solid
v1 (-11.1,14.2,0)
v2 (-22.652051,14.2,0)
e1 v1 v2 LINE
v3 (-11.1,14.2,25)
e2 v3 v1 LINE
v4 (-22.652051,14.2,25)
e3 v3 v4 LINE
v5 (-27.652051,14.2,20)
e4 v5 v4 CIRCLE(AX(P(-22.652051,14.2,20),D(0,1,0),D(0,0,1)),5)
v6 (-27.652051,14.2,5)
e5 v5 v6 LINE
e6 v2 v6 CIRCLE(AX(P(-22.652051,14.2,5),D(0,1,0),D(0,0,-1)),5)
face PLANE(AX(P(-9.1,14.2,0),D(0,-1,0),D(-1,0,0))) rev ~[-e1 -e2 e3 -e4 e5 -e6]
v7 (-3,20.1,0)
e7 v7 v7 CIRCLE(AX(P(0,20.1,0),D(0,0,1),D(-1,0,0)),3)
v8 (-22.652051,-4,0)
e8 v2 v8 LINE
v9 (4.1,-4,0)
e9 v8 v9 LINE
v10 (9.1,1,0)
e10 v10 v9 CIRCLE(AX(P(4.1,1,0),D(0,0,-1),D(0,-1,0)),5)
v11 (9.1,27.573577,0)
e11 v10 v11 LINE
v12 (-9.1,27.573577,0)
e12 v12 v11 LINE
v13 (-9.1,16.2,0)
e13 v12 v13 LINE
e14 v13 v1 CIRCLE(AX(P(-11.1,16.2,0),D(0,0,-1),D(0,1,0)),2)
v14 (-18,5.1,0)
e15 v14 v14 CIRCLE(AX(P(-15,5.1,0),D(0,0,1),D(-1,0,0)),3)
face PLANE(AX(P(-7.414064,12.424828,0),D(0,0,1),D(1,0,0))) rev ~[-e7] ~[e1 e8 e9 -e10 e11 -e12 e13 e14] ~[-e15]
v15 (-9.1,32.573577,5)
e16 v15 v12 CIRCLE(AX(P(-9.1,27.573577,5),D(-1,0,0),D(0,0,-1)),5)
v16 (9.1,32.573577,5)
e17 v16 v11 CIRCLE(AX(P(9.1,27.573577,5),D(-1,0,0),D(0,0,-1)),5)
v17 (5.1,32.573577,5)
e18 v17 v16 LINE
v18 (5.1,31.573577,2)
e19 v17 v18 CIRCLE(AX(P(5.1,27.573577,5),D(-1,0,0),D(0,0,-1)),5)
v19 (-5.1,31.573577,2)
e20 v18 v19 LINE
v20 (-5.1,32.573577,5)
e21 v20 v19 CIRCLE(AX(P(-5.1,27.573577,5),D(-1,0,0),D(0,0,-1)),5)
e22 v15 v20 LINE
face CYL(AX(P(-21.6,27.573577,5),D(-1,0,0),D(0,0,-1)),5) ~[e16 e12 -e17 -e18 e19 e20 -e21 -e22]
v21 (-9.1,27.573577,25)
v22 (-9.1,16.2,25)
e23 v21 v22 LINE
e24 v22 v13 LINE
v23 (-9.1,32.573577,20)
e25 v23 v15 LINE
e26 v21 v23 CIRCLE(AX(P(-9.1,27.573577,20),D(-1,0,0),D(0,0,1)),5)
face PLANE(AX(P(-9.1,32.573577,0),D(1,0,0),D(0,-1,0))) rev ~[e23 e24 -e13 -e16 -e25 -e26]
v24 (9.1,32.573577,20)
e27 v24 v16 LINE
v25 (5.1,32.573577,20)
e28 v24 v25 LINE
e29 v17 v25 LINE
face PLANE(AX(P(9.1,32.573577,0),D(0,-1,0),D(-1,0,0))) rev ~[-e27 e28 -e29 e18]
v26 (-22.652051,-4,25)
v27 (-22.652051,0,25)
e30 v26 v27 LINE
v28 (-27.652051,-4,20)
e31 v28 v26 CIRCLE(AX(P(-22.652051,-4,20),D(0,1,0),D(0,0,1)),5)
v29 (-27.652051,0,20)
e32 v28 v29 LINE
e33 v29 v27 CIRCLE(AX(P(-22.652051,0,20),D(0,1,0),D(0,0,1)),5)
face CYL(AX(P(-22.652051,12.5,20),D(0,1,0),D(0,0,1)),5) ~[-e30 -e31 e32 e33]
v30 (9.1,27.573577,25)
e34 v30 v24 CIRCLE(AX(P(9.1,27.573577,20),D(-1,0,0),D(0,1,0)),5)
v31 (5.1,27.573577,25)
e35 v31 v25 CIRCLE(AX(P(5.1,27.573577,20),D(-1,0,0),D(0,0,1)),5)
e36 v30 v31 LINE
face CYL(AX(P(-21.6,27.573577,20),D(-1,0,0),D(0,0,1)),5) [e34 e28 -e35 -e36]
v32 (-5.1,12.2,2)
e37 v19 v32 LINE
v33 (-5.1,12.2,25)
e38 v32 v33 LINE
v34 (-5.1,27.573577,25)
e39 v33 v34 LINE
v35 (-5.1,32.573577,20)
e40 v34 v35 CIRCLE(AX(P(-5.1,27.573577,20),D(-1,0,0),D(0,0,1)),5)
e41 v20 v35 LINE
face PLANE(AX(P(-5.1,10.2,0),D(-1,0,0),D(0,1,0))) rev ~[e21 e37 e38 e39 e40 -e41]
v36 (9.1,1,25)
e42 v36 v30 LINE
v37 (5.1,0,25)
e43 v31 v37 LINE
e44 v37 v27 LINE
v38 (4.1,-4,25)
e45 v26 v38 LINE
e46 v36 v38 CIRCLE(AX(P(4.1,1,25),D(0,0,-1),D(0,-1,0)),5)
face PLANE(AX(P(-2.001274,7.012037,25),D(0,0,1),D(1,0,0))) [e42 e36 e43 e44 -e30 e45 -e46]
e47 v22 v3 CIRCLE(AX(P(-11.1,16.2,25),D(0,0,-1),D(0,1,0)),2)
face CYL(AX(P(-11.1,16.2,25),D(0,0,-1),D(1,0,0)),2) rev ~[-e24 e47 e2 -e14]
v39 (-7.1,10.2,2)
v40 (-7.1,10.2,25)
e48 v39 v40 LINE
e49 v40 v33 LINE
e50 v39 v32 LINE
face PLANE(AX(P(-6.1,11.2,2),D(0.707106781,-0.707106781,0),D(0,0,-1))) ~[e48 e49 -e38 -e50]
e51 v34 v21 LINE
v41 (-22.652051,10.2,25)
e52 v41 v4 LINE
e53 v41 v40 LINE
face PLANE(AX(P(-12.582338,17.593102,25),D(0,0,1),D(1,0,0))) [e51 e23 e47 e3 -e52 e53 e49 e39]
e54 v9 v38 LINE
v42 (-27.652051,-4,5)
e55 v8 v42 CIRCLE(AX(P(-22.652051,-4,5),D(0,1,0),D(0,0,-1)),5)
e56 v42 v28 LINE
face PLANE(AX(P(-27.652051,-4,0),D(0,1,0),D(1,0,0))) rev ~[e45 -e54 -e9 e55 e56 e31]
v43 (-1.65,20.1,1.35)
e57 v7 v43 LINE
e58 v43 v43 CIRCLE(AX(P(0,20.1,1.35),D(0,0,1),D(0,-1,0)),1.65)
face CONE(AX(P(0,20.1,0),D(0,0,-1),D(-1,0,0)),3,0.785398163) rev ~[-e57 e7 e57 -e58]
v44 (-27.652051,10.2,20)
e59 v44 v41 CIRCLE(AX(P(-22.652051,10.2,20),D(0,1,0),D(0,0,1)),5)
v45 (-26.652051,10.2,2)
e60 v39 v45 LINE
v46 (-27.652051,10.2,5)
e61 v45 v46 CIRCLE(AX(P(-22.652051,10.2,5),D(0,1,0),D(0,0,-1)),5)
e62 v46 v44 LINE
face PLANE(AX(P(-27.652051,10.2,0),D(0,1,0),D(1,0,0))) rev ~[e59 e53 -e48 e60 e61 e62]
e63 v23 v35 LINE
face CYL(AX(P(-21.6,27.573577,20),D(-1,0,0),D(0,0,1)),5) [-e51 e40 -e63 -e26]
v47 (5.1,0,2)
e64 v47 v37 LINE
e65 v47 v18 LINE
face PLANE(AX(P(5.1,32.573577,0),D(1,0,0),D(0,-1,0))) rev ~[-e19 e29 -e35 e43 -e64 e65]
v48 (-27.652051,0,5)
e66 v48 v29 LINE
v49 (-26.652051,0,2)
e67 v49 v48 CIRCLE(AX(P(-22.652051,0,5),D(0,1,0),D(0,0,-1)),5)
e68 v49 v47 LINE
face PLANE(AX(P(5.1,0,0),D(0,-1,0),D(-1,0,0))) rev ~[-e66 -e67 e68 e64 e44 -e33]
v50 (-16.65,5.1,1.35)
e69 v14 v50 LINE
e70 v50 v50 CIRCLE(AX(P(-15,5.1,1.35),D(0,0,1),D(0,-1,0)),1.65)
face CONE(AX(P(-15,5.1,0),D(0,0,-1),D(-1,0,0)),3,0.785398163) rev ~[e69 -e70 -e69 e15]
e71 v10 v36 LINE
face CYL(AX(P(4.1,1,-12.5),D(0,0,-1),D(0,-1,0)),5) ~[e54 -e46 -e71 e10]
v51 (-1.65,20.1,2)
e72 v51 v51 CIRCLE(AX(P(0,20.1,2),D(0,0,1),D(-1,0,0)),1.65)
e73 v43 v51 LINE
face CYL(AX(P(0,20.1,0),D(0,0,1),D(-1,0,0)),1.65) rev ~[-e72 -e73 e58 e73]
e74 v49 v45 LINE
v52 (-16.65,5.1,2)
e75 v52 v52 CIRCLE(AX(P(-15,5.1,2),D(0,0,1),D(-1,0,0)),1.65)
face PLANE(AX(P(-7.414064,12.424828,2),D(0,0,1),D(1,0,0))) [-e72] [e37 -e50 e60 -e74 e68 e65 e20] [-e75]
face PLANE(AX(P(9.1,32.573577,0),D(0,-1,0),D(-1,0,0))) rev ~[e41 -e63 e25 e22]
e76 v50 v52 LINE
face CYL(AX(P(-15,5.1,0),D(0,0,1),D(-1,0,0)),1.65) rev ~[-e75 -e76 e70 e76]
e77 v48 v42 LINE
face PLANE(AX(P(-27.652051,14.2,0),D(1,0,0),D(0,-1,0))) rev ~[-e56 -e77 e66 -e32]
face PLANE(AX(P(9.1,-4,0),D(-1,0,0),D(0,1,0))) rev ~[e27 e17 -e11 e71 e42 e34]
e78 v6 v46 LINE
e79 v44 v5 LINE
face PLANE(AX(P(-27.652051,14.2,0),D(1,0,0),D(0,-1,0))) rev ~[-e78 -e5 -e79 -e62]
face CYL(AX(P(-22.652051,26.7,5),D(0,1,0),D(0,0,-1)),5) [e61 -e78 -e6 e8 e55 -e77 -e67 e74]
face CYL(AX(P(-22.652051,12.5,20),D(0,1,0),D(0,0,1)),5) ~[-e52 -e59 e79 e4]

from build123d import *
from build123d import SkipClean  # not in build123d's __all__

# Parameters (mm, degrees)
F1_DEPTH       = 2
F2_DEPTH       = 25
F3_T1_DEPTH    = 29
F3_T3_DEPTH    = 29
F3_T5_DEPTH    = 29
F3_T7_DEPTH    = 29
F3_T9_DEPTH    = 43.2
F3_T11_DEPTH   = 43.2
F3_T13_DEPTH   = 50
F4_R           = 2
F5_SIZE        = 2
F7_D           = 3.3
F7_CSINK_D     = 6
F7_CSINK_ANGLE = 90


# Not quite as in the source:
# - a fillet or chamfer that OpenCascade refuses, or shapes differently, is made with other operations: its cross-section is extruded or revolved along the edge and cut away or added
# - a feature names something its author has since deleted; it is built from what else it names


with BuildPart() as f1:
    # F0 (on Top) → F1 (new body)
    with BuildSketch(Plane.XY):
        Polygon((5.1, 0), (5.1, 10.2), (5.1, 32.5735770881), (-5.1, 32.5735770881), (-5.1, 10.2), (-27.6520505063, 10.2), (-27.6520505063, 0), (0, 0), align=None)
        Polygon((5.1, 32.5735770881), (5.1, 10.2), (5.1, 0), (0, 0), (-27.6520505063, 0), (-27.6520505063, -4), (0, -4), (9.1, -4), (9.1, 32.5735770881), align=None)
        Polygon((-5.1, 10.2), (-5.1, 32.5735770881), (-9.1, 32.5735770881), (-9.1, 14.2), (-27.6520505063, 14.2), (-27.6520505063, 10.2), align=None)
    extrude(amount=F1_DEPTH)

    # F0 (on Top) → F2 (join)
    with BuildSketch(Plane.XY):
        Polygon((-5.1, 10.2), (-5.1, 32.5735770881), (-9.1, 32.5735770881), (-9.1, 14.2), (-27.6520505063, 14.2), (-27.6520505063, 10.2), align=None)
        Polygon((5.1, 32.5735770881), (5.1, 10.2), (5.1, 0), (0, 0), (-27.6520505063, 0), (-27.6520505063, -4), (0, -4), (9.1, -4), (9.1, 32.5735770881), align=None)
    extrude(amount=F2_DEPTH)

    # F3: fillet of radius 5 on 7 edges, made by hand

    # F3_s2 → F3_t1 (cut)
    with BuildSketch(Plane.XZ.offset(-12.5)):
        with BuildLine():
            ThreePointArc((-22.6520505063, 25), (-26.1875844123, 23.5355339059), (-27.6520505063, 20))
            Line((-27.6520505063, 20), (-27.6520505063, 25))
            Line((-27.6520505063, 25), (-22.6520505063, 25))
        make_face()
    extrude(amount=F3_T1_DEPTH, mode=Mode.SUBTRACT)

    # F3_s4 → F3_t3 (cut)
    with BuildSketch(Plane.XZ.offset(-26.7)):
        with BuildLine():
            ThreePointArc((-22.6520505063, 25), (-26.1875844123, 23.5355339059), (-27.6520505063, 20))
            Line((-27.6520505063, 20), (-27.6520505063, 25))
            Line((-27.6520505063, 25), (-22.6520505063, 25))
        make_face()
    extrude(amount=F3_T3_DEPTH, mode=Mode.SUBTRACT)

    # F3_s6 → F3_t5 (cut)
    with BuildSketch(Plane.YZ.offset(-21.6)):
        with BuildLine():
            ThreePointArc((27.5735770881, 25), (31.1091109941, 23.5355339059), (32.5735770881, 20))
            Line((32.5735770881, 20), (32.5735770881, 25))
            Line((32.5735770881, 25), (27.5735770881, 25))
        make_face()
    extrude(amount=F3_T5_DEPTH, mode=Mode.SUBTRACT)

    # F3_s8 → F3_t7 (cut)
    with BuildSketch(Plane.YZ.offset(-7.4)):
        with BuildLine():
            ThreePointArc((32.5735770881, 20), (31.1091109941, 23.5355339059), (27.5735770881, 25))
            Line((27.5735770881, 25), (32.5735770881, 25))
            Line((32.5735770881, 25), (32.5735770881, 20))
        make_face()
    with SkipClean():  # cleaning this boolean's faces spoils the solid; the shape is the same uncleaned
        extrude(amount=F3_T7_DEPTH, mode=Mode.SUBTRACT)

    # F3_s10 → F3_t9 (cut)
    with BuildSketch(Plane.XZ.offset(-26.7)):
        with BuildLine():
            ThreePointArc((-22.6520505063, 0), (-26.1875844123, 1.4644660941), (-27.6520505063, 5))
            Line((-27.6520505063, 5), (-27.6520505063, 0))
            Line((-27.6520505063, 0), (-22.6520505063, 0))
        make_face()
    extrude(amount=F3_T9_DEPTH, mode=Mode.SUBTRACT)

    # F3_s12 → F3_t11 (cut)
    with BuildSketch(Plane.YZ.offset(-21.6)):
        with BuildLine():
            ThreePointArc((27.5735770881, 0), (31.1091109941, 1.4644660941), (32.5735770881, 5))
            Line((32.5735770881, 5), (32.5735770881, 0))
            Line((32.5735770881, 0), (27.5735770881, 0))
        make_face()
    extrude(amount=F3_T11_DEPTH, mode=Mode.SUBTRACT)

    # F3_s14 → F3_t13 (cut)
    with BuildSketch(Plane.XY.offset(-12.5)):
        with BuildLine():
            ThreePointArc((4.1, -4), (7.6355339059, -2.5355339059), (9.1, 1))
            Line((9.1, 1), (9.1, -4))
            Line((9.1, -4), (4.1, -4))
        make_face()
    extrude(amount=F3_T13_DEPTH, mode=Mode.SUBTRACT)

    # F4
    f4_edges = [f1.edges().sort_by_distance(p)[0] for p in [
        (-9.1, 14.2, 12.5),
    ]]
    fillet(f4_edges, radius=F4_R)

    # F5
    f5_edges = [f1.edges().sort_by_distance(p)[0] for p in [
        (-5.1, 10.2, 13.5),
    ]]
    chamfer(f5_edges, length=F5_SIZE)

    # F7 (through all)
    with Locations(Plane(origin=(0, 0, 0), x_dir=(1, 0, 0), z_dir=(0, 0, -1))):
        with Locations((-15, -5.1), (0, -20.1)):
            CounterSinkHole(F7_D / 2, F7_CSINK_D / 2, counter_sink_angle=F7_CSINK_ANGLE)


solid = f1.part
